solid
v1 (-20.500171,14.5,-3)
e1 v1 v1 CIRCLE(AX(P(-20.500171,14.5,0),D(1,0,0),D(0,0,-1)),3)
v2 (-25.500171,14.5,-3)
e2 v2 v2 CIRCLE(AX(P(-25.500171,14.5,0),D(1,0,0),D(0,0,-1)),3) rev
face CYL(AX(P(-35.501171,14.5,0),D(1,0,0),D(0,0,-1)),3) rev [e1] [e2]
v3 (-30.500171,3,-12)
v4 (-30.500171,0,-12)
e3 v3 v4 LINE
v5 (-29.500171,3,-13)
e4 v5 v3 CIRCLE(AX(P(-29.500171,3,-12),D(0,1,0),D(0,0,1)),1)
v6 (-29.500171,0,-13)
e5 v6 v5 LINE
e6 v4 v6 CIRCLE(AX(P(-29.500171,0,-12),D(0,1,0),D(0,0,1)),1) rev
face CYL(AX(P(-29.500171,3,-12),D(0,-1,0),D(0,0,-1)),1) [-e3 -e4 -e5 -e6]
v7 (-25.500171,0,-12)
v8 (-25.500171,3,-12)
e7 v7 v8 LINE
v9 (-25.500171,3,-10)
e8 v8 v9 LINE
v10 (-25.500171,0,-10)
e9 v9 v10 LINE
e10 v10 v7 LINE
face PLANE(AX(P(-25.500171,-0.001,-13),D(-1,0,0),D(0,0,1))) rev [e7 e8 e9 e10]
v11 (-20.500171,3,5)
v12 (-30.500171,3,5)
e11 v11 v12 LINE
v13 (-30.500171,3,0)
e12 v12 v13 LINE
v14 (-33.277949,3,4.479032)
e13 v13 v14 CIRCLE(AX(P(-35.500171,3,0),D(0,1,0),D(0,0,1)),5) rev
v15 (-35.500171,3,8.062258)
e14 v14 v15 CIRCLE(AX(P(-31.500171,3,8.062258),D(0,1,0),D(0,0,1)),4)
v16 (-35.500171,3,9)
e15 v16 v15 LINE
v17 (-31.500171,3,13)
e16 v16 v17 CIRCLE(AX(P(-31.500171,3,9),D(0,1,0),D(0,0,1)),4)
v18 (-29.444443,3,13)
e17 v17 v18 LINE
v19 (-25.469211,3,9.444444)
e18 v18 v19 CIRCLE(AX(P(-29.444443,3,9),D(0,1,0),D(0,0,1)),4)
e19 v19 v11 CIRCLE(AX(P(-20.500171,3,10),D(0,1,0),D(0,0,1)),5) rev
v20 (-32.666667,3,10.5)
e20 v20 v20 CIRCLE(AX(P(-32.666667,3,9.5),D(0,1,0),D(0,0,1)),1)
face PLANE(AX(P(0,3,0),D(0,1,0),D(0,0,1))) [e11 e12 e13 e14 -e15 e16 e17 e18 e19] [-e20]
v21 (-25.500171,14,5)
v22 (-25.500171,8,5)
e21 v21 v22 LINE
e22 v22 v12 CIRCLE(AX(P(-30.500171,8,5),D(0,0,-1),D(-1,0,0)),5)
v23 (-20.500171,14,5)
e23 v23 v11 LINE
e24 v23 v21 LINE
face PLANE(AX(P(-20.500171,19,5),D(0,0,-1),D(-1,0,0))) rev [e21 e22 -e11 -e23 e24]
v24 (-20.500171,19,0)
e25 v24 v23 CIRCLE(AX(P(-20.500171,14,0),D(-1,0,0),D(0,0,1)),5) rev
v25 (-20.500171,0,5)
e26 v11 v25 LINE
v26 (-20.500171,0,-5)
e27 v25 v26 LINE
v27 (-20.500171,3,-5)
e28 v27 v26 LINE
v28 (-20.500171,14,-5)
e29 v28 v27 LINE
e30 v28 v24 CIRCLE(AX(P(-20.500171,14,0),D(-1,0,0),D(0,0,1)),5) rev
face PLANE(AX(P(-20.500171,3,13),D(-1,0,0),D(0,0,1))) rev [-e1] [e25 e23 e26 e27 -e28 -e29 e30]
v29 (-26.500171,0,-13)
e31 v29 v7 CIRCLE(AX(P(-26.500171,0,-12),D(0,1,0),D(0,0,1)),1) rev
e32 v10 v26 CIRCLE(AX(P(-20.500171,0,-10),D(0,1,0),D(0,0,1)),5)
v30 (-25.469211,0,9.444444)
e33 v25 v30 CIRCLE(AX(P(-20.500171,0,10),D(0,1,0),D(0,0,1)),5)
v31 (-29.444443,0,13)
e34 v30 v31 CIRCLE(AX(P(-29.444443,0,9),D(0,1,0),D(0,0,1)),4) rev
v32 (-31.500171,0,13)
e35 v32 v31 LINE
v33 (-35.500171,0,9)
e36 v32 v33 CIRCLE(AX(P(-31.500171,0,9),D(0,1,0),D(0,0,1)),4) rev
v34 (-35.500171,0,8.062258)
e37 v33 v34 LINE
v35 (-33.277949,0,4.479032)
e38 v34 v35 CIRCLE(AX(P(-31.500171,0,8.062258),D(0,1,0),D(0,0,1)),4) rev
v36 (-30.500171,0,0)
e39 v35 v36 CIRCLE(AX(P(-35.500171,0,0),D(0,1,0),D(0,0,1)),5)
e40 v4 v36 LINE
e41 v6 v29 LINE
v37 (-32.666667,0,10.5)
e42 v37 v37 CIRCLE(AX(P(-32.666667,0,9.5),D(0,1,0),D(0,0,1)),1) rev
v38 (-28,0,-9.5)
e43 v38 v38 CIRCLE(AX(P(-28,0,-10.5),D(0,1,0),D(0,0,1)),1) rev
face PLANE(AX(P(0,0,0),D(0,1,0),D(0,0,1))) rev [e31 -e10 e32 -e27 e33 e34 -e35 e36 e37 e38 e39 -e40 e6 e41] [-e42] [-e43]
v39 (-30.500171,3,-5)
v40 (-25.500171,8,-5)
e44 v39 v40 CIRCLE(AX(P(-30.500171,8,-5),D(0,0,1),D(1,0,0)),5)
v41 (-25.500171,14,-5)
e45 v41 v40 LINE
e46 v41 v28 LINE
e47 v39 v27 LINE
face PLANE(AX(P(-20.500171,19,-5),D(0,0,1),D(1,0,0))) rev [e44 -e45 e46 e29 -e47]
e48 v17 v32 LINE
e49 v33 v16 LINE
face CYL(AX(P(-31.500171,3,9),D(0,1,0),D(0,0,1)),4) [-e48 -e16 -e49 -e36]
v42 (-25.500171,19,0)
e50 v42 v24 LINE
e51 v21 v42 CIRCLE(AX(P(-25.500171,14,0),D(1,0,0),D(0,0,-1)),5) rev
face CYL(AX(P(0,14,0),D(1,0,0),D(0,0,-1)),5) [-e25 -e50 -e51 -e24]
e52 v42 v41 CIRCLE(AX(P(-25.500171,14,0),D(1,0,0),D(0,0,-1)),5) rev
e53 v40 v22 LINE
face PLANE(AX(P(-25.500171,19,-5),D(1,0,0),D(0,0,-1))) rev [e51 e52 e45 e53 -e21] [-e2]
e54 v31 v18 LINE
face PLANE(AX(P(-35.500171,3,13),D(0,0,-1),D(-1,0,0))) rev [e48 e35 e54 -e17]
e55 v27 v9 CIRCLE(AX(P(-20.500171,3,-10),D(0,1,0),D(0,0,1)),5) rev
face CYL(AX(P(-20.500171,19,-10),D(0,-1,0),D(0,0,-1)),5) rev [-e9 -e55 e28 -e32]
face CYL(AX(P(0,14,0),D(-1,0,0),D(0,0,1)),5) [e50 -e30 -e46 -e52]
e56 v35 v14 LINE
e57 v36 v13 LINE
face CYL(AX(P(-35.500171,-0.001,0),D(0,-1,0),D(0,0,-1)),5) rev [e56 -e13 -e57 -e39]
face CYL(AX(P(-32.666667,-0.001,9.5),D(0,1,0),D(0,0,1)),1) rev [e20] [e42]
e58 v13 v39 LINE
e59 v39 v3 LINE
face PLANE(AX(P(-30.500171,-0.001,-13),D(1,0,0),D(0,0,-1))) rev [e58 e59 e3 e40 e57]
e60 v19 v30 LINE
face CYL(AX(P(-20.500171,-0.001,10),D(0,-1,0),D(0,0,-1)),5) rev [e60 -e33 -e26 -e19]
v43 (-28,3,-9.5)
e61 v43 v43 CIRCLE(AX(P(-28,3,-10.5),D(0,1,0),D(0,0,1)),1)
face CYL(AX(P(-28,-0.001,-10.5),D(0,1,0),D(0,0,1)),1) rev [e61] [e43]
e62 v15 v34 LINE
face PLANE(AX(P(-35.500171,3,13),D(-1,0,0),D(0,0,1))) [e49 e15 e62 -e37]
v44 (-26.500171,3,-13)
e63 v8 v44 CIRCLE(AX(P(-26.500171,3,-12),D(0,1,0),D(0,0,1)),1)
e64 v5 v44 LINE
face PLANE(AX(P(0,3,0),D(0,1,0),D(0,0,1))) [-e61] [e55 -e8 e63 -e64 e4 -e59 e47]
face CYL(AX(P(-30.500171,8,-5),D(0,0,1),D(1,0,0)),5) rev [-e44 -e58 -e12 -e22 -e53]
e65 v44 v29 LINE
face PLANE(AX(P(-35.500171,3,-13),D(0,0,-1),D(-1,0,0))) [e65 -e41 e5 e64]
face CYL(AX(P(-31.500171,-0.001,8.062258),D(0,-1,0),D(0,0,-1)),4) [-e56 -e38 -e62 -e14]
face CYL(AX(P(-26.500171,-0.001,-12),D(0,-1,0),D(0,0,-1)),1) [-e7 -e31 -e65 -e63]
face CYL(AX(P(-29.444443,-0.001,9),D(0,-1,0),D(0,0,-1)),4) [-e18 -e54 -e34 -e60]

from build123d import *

# Parameters (mm, degrees)
SKETCH1_W           = 15
SKETCH1_H           = 26
BOSS_EXTRUDE1_DEPTH = 3
CUT_EXTRUDE1_REACH  = 39.924
SKETCH2_R           = 1
SKETCH3_W           = 5
SKETCH3_H           = 10
BOSS_EXTRUDE2_DEPTH = 16
CUT_EXTRUDE2_REACH  = 29.477
SKETCH4_R           = 3
CUT_EXTRUDE3_REACH  = 43.052
SKETCH5_W           = 5
SKETCH5_H           = 8
SKETCH5_H_2         = 18
FILLET1_R           = 5
FILLET2_R           = 5
FILLET3_R           = 5
FILLET4_R           = 4
FILLET5_R           = 1


with BuildPart() as part:
    # Sketch1 → Boss-Extrude1 (new body)
    with BuildSketch(Plane(origin=(0, 0, 0), x_dir=(1, 0, 0), z_dir=(0, 1, 0))):
        with Locations((-28.000171023, 0)):
            Rectangle(SKETCH1_W, SKETCH1_H)
    extrude(amount=BOSS_EXTRUDE1_DEPTH)

    # Sketch2 → Cut-Extrude1 (cut, up to next)
    with BuildSketch(Plane(origin=(0, 3, 0), x_dir=(1, 0, 0), z_dir=(0, 1, 0)), mode=Mode.PRIVATE) as cut_extrude1_sk1:
        with Locations(Location((-32.666666667, -9.5, 0), (0, 0, 270))):
            Circle(SKETCH2_R)
    cut_extrude1_tool1 = extrude(cut_extrude1_sk1.sketch, amount=-CUT_EXTRUDE1_REACH, mode=Mode.PRIVATE) & part.part
    # Sketch2 → Cut-Extrude1 (cut, up to next)
    with BuildSketch(Plane(origin=(0, 3, 0), x_dir=(1, 0, 0), z_dir=(0, 1, 0)), mode=Mode.PRIVATE) as cut_extrude1_sk2:
        with Locations(Location((-28, 10.5, 0), (0, 0, 270))):
            Circle(SKETCH2_R)
    cut_extrude1_tool2 = extrude(cut_extrude1_sk2.sketch, amount=-CUT_EXTRUDE1_REACH, mode=Mode.PRIVATE) & part.part
    add(cut_extrude1_tool1.solids().sort_by_distance((-32.666667, 3, 9.5))[0], mode=Mode.SUBTRACT)
    add(cut_extrude1_tool2.solids().sort_by_distance((-28, 3, -10.5))[0], mode=Mode.SUBTRACT)

    # Sketch3 → Boss-Extrude2 (add)
    with BuildSketch(Plane(origin=(0, 3, 0), x_dir=(1, 0, 0), z_dir=(0, 1, 0))):
        with Locations((-23.000171023, 0)):
            Rectangle(SKETCH3_W, SKETCH3_H)
    extrude(amount=BOSS_EXTRUDE2_DEPTH)

    # Sketch4 → Cut-Extrude2 (cut, up to next)
    with BuildSketch(Plane(origin=(-20.500171023, 0, 0), x_dir=(0, 0, -1), z_dir=(1, 0, 0)), mode=Mode.PRIVATE) as cut_extrude2_sk1:
        with Locations((0, 14.5)):
            Circle(SKETCH4_R)
    cut_extrude2_tool1 = extrude(cut_extrude2_sk1.sketch, amount=-CUT_EXTRUDE2_REACH, mode=Mode.PRIVATE) & part.part
    add(cut_extrude2_tool1.solids().sort_by_distance((-20.500171, 14.5, 0))[0], mode=Mode.SUBTRACT)

    # Sketch5 → Cut-Extrude3 (cut, up to next)
    with BuildSketch(Plane(origin=(0, 3, 0), x_dir=(1, 0, 0), z_dir=(0, 1, 0)), mode=Mode.PRIVATE) as cut_extrude3_sk1:
        with Locations((-23.000171023, 9)):
            Rectangle(SKETCH5_W, SKETCH5_H)
    cut_extrude3_tool1 = extrude(cut_extrude3_sk1.sketch, amount=-CUT_EXTRUDE3_REACH, mode=Mode.PRIVATE) & part.part
    # Sketch5 → Cut-Extrude3 (cut, up to next)
    with BuildSketch(Plane(origin=(0, 3, 0), x_dir=(1, 0, 0), z_dir=(0, 1, 0)), mode=Mode.PRIVATE) as cut_extrude3_sk2:
        with Locations((-33.000171023, 4)):
            Rectangle(SKETCH5_W, SKETCH5_H_2)
    cut_extrude3_tool2 = extrude(cut_extrude3_sk2.sketch, amount=-CUT_EXTRUDE3_REACH, mode=Mode.PRIVATE) & part.part
    # Sketch5 → Cut-Extrude3 (cut, up to next)
    with BuildSketch(Plane(origin=(0, 3, 0), x_dir=(1, 0, 0), z_dir=(0, 1, 0)), mode=Mode.PRIVATE) as cut_extrude3_sk3:
        with Locations((-23.000171023, -9)):
            Rectangle(SKETCH5_W, SKETCH5_H)
    cut_extrude3_tool3 = extrude(cut_extrude3_sk3.sketch, amount=-CUT_EXTRUDE3_REACH, mode=Mode.PRIVATE) & part.part
    add(cut_extrude3_tool1.solids().sort_by_distance((-23.000171, 3, -9))[0], mode=Mode.SUBTRACT)
    add(cut_extrude3_tool2.solids().sort_by_distance((-33.000171, 3, -4))[0], mode=Mode.SUBTRACT)
    add(cut_extrude3_tool3.solids().sort_by_distance((-23.000171, 3, 9))[0], mode=Mode.SUBTRACT)

    # Fillet1
    fillet1_edges = [part.edges().sort_by_distance(p)[0] for p in [
        (-23.000171023, 19, -5),
        (-23.000171023, 19, 5),
    ]]
    fillet(fillet1_edges, radius=FILLET1_R - 0.0001)  # a hair under: the kernel refuses the full size

    # Fillet2
    fillet2_edges = [part.edges().sort_by_distance(p)[0] for p in [
        (-25.500171023, 3, 0),
    ]]
    fillet(fillet2_edges, radius=FILLET2_R - 0.0001)  # a hair under: the kernel refuses the full size

    # Fillet3
    fillet3_edges = [part.edges().sort_by_distance(p)[0] for p in [
        (-30.500171023, 1.5, 5),
        (-25.500171023, 1.5, -5),
        (-25.500171023, 1.5, 5),
    ]]
    fillet(fillet3_edges, radius=FILLET3_R - 0.0001)  # a hair under: the kernel refuses the full size

    # Fillet4
    fillet4_edges = [part.edges().sort_by_distance(p)[0] for p in [
        (-35.500171023, 1.5, 5),
        (-35.500171023, 1.5, 13),
        (-25.500171023, 1.5, 13),
    ]]
    fillet(fillet4_edges, radius=FILLET4_R)

    # Fillet5
    fillet5_edges = [part.edges().sort_by_distance(p)[0] for p in [
        (-30.500171023, 1.5, -13),
        (-25.500171023, 1.5, -13),
    ]]
    fillet(fillet5_edges, radius=FILLET5_R)


solid = part.part
